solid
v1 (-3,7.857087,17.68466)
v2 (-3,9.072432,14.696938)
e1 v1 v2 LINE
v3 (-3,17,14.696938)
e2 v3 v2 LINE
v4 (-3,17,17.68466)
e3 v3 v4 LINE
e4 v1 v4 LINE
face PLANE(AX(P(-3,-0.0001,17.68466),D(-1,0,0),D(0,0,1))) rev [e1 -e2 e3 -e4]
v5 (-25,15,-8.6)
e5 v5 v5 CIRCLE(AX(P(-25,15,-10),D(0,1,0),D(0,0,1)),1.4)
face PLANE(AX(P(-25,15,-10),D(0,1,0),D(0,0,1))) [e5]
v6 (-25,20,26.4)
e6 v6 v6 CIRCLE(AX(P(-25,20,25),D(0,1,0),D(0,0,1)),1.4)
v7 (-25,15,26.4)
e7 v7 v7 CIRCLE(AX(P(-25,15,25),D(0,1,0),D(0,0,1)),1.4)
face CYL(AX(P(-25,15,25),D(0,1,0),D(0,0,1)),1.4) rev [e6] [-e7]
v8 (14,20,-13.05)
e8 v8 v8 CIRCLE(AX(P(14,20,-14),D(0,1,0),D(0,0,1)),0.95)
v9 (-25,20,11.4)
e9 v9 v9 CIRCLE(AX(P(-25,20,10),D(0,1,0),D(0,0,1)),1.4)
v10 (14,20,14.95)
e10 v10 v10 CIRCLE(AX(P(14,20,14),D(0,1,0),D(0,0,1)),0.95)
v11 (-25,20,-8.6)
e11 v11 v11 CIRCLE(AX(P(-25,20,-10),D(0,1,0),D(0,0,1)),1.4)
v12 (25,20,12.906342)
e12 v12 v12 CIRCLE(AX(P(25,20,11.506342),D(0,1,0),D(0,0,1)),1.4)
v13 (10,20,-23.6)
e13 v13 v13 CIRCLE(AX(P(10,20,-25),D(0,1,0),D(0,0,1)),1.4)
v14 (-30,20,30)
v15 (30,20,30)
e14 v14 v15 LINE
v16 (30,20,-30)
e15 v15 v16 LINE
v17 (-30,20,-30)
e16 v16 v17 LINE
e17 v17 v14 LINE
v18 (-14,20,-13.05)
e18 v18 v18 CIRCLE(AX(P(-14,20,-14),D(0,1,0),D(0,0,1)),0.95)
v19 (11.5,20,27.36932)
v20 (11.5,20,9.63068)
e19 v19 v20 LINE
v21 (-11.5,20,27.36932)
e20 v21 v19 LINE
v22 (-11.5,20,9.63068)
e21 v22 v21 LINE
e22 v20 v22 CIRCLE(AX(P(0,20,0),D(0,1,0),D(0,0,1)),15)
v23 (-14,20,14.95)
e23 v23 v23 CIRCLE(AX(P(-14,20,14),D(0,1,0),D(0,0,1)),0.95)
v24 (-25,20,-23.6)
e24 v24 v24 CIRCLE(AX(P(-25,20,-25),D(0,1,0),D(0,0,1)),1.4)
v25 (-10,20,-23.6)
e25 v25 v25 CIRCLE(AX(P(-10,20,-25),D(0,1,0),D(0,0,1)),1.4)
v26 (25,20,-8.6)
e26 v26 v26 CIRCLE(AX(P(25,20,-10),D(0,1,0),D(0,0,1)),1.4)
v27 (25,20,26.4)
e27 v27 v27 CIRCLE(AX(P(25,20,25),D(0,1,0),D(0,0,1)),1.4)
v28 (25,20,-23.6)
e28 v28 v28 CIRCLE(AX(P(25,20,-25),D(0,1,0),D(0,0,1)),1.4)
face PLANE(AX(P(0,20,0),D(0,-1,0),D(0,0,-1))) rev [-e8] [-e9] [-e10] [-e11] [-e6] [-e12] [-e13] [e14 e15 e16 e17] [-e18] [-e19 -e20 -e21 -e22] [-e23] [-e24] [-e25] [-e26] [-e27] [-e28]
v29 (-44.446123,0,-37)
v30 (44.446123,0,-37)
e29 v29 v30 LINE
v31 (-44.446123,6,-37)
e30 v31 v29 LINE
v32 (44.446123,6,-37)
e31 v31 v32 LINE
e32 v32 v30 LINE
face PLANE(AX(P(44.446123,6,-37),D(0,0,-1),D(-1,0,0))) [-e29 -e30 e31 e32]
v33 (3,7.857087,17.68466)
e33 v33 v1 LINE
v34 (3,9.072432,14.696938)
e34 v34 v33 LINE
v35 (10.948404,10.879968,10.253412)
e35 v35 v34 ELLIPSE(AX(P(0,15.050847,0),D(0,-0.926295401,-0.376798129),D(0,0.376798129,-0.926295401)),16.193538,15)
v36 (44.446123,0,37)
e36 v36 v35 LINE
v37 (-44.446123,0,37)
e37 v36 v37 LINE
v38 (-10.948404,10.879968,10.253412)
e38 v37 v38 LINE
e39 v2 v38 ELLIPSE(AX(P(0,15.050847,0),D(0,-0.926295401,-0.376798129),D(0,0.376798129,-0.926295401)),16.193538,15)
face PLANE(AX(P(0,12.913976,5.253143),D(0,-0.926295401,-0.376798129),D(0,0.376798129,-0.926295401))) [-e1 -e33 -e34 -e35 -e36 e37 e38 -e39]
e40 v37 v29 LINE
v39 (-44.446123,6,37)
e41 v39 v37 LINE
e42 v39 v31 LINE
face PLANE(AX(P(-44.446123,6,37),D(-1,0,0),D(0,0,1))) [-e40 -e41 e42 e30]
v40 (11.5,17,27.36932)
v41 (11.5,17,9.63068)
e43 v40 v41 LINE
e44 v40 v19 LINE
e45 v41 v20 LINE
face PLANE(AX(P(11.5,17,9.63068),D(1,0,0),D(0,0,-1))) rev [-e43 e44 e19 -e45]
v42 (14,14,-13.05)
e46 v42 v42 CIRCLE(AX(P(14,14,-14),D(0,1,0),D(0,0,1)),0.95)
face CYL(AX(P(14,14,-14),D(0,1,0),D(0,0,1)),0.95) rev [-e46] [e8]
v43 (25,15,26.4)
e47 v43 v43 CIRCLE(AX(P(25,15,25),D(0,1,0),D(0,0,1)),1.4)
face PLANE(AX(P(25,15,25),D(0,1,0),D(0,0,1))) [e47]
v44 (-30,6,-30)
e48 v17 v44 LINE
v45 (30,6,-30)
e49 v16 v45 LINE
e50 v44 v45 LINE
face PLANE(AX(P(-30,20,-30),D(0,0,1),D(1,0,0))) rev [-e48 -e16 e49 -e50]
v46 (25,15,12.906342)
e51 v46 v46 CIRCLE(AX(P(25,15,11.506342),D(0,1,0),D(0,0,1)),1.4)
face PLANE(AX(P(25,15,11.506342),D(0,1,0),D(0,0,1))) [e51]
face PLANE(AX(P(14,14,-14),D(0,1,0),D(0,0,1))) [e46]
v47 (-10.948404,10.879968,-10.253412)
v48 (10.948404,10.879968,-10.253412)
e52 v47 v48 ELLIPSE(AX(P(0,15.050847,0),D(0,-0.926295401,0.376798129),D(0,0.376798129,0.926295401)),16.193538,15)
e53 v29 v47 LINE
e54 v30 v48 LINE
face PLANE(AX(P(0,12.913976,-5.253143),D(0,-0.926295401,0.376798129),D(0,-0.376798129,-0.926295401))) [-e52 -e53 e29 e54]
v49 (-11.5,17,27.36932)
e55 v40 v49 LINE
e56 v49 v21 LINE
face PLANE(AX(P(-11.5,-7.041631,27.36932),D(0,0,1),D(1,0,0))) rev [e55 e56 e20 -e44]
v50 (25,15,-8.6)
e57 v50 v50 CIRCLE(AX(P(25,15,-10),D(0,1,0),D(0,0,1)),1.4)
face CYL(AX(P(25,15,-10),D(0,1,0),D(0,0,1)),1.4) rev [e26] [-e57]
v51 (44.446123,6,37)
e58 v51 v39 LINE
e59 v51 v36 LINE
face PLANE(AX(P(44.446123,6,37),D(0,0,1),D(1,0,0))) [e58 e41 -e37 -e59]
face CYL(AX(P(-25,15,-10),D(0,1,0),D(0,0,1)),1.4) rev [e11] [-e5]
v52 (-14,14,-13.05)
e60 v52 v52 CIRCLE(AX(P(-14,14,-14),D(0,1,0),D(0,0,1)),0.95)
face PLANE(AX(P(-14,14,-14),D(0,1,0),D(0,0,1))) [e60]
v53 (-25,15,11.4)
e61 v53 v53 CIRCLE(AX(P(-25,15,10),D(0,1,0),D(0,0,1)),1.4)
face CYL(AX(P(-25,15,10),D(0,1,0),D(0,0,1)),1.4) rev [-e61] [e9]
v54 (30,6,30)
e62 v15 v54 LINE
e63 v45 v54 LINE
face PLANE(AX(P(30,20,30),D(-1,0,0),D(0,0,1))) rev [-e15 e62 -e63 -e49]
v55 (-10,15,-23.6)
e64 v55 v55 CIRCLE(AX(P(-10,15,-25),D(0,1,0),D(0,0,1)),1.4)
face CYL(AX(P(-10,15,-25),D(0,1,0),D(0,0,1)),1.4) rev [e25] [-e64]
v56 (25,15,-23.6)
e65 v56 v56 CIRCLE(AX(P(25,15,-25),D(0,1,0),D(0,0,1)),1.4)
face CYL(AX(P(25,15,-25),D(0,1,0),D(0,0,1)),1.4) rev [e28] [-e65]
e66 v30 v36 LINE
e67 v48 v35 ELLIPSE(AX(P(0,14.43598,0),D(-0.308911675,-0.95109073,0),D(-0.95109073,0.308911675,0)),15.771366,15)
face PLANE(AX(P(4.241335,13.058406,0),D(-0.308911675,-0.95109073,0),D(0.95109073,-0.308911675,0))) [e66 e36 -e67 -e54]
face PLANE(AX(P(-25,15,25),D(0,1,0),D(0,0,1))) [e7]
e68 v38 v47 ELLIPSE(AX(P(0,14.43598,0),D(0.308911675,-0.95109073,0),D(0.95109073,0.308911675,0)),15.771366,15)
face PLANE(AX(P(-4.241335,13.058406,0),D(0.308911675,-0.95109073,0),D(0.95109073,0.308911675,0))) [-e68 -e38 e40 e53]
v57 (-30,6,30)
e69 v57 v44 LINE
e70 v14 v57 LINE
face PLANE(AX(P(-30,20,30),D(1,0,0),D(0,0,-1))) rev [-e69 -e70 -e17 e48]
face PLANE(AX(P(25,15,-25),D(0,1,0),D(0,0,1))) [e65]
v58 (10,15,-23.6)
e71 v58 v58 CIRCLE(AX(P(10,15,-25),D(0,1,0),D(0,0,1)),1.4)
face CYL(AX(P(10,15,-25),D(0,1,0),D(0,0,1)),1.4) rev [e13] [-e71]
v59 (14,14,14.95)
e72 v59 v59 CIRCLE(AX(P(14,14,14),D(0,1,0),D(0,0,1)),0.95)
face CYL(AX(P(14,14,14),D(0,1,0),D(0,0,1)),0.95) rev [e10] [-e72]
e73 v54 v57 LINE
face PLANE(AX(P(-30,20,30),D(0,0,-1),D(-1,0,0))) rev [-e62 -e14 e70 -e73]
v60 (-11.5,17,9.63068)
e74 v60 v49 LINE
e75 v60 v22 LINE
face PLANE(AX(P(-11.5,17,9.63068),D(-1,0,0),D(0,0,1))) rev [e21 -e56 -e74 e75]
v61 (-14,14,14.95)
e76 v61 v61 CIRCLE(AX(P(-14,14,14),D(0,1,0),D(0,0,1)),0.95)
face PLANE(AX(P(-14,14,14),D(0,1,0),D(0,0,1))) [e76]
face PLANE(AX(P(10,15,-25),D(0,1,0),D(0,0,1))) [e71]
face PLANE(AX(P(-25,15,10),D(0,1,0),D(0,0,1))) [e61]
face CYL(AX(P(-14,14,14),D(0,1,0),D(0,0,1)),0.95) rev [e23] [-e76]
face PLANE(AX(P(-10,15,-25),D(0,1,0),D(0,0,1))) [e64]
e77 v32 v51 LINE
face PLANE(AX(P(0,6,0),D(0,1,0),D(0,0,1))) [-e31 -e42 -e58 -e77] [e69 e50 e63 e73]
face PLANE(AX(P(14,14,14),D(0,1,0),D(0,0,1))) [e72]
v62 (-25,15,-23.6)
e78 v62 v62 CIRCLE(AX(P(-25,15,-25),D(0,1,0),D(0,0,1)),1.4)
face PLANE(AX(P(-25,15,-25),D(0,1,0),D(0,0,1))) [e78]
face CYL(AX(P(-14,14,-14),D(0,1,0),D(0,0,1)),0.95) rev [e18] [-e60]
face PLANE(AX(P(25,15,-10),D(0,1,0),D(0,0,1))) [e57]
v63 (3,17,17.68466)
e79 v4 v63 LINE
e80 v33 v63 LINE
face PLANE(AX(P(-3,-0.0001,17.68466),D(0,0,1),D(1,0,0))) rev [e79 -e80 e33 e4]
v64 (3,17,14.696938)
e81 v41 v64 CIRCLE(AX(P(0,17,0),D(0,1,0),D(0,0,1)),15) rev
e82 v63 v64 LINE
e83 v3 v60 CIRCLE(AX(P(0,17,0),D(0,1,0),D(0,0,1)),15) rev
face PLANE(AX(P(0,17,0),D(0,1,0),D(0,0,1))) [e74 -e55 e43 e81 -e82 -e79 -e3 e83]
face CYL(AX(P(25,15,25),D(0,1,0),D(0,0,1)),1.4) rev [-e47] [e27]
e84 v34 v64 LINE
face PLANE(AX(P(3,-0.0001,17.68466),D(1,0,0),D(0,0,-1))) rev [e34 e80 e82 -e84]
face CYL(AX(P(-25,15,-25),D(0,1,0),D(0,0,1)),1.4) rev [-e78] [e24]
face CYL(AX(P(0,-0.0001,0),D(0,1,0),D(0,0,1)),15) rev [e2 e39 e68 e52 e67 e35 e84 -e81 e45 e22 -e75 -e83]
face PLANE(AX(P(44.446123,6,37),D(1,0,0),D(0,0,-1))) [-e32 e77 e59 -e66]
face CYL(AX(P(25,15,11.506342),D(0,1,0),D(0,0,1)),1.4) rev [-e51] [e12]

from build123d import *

# Parameters (mm, degrees)
SKETCH1_W           = 60
SKETCH1_H           = 60
BOSS_EXTRUDE1_DEPTH = 20
SKETCH10_W          = 15
SKETCH10_H          = 15
CUT_EXTRUDE4_DEPTH  = 8
SKETCH9_W           = 88.892246252
SKETCH9_H           = 74
SKETCH9_W_2         = 60
SKETCH9_H_2         = 60
BOSS_EXTRUDE4_DEPTH = 6
SKETCH2_R           = 15
CUT_EXTRUDE5_DEPTH  = 62.191975628
SKETCH11_R          = 0.95
CUT_EXTRUDE6_DEPTH  = 6
SKETCH12_W          = 23
SKETCH12_H          = 10.738639716
CUT_EXTRUDE7_DEPTH  = 3
SKETCH13_W          = 23
SKETCH13_H          = 7
CUT_EXTRUDE8_DEPTH  = 3
SKETCH14_R          = 1.4
CUT_EXTRUDE9_DEPTH  = 5
SKETCH15_W          = 6
SKETCH15_H          = 8
CUT_EXTRUDE10_DEPTH = 61.278170847


with BuildPart() as part:
    # Sketch1 → Boss-Extrude1 (new body)
    with BuildSketch(Plane(origin=(0, 0, 0), x_dir=(1, 0, 0), z_dir=(0, 1, 0))):
        Rectangle(SKETCH1_W, SKETCH1_H)
    extrude(amount=BOSS_EXTRUDE1_DEPTH)

    # Sketch10 → Cut-Extrude4 (cut)
    with BuildSketch(Plane(origin=(0, 20, 0), x_dir=(1, 0, 0), z_dir=(0, 1, 0))):
        Rectangle(SKETCH10_W, SKETCH10_H)
    extrude(amount=-CUT_EXTRUDE4_DEPTH, mode=Mode.SUBTRACT)

    # Sketch9 → Boss-Extrude4 (add)
    with BuildSketch(Plane.XZ):
        Rectangle(SKETCH9_W, SKETCH9_H)
        Rectangle(SKETCH9_W_2, SKETCH9_H_2, mode=Mode.SUBTRACT)
    extrude(amount=-BOSS_EXTRUDE4_DEPTH)

    # Cut-Loft2: read off the stored shape, not the designer's step
    # Cut-Loft2: loft between two sections, ruled curve by curve
    cut_loft2_from = [
        Edge.make_line((-7.5, 12, -7.5), (7.5, 12, -7.5)),
        Edge.make_line((7.5, 12, -7.5), (7.5, 12, 7.5)),
        Edge.make_line((-7.5, 12, 7.5), (-7.5, 12, -7.5)),
        Edge.make_line((7.5, 12, 7.5), (-7.5, 12, 7.5)),
    ]
    cut_loft2_to = [
        Edge.make_line((-44.446123126, 0, -37), (44.446123126, 0, -37)),
        Edge.make_line((44.446123126, 0, -37), (44.446123126, 0, 37)),
        Edge.make_line((-44.446123126, 0, 37), (-44.446123126, 0, -37)),
        Edge.make_line((44.446123126, 0, 37), (-44.446123126, 0, 37)),
    ]
    cut_loft2 = Solid(Shell([*[Face.make_surface_from_curves(cut_loft2_from[k], cut_loft2_to[k]) for k in range(4)], Face(Wire(cut_loft2_from)), Face(Wire(cut_loft2_to))]))
    add(cut_loft2, mode=Mode.SUBTRACT)

    # Sketch2 → Cut-Extrude5 (cut, through all)
    with BuildSketch(Plane(origin=(0, 20, 0), x_dir=(1, 0, 0), z_dir=(0, 1, 0))):
        with Locations(Location((0, 0, 0), (0, 0, 270))):
            Circle(SKETCH2_R)
    extrude(amount=-CUT_EXTRUDE5_DEPTH, mode=Mode.SUBTRACT)

    # Sketch11 → Cut-Extrude6 (cut)
    with BuildSketch(Plane(origin=(0, 20, 0), x_dir=(1, 0, 0), z_dir=(0, 1, 0))):
        with Locations(Location((-14, 14, 0), (0, 0, 270))):
            Circle(SKETCH11_R)
        with Locations(Location((14, 14, 0), (0, 0, 270))):
            Circle(SKETCH11_R)
        with Locations(Location((14, -14, 0), (0, 0, 270))):
            Circle(SKETCH11_R)
        with Locations(Location((-14, -14, 0), (0, 0, 270))):
            Circle(SKETCH11_R)
    extrude(amount=-CUT_EXTRUDE6_DEPTH, mode=Mode.SUBTRACT)

    # Sketch12 → Cut-Extrude7 (cut)
    with BuildSketch(Plane(origin=(0, 20, 0), x_dir=(1, 0, 0), z_dir=(0, 1, 0))):
        with Locations((0, -15)):
            Rectangle(SKETCH12_W, SKETCH12_H)
    extrude(amount=-CUT_EXTRUDE7_DEPTH, mode=Mode.SUBTRACT)

    # Sketch13 → Cut-Extrude8 (cut)
    with BuildSketch(Plane(origin=(0, 20, 0), x_dir=(1, 0, 0), z_dir=(0, 1, 0))):
        with Locations((0, -23.869319858)):
            Rectangle(SKETCH13_W, SKETCH13_H)
    extrude(amount=-CUT_EXTRUDE8_DEPTH, mode=Mode.SUBTRACT)

    # Sketch14 → Cut-Extrude9 (cut)
    with BuildSketch(Plane(origin=(0, 20, 0), x_dir=(1, 0, 0), z_dir=(0, 1, 0))):
        with Locations(Location((-25, 25, 0), (0, 0, 270))):
            Circle(SKETCH14_R)
        with Locations(Location((25, 25, 0), (0, 0, 270))):
            Circle(SKETCH14_R)
        with Locations(Location((25, -25, 0), (0, 0, 270))):
            Circle(SKETCH14_R)
        with Locations(Location((-25, -25, 0), (0, 0, 270))):
            Circle(SKETCH14_R)
        with Locations(Location((-10, 25, 0), (0, 0, 270))):
            Circle(SKETCH14_R)
        with Locations(Location((10, 25, 0), (0, 0, 270))):
            Circle(SKETCH14_R)
        with Locations(Location((-25, 10, 0), (0, 0, 270))):
            Circle(SKETCH14_R)
        with Locations(Location((-25, -10, 0), (0, 0, 270))):
            Circle(SKETCH14_R)
        with Locations(Location((25, 10, 0), (0, 0, 270))):
            Circle(SKETCH14_R)
        with Locations(Location((25, -11.506341958, 0), (0, 0, 270))):
            Circle(SKETCH14_R)
    extrude(amount=-CUT_EXTRUDE9_DEPTH, mode=Mode.SUBTRACT)

    # Sketch15 → Cut-Extrude10 (cut, through all)
    with BuildSketch(Plane(origin=(0, 17, 0), x_dir=(1, 0, 0), z_dir=(0, 1, 0))):
        with Locations((0, -13.684659929)):
            Rectangle(SKETCH15_W, SKETCH15_H)
    extrude(amount=-CUT_EXTRUDE10_DEPTH, mode=Mode.SUBTRACT)


solid = part.part
